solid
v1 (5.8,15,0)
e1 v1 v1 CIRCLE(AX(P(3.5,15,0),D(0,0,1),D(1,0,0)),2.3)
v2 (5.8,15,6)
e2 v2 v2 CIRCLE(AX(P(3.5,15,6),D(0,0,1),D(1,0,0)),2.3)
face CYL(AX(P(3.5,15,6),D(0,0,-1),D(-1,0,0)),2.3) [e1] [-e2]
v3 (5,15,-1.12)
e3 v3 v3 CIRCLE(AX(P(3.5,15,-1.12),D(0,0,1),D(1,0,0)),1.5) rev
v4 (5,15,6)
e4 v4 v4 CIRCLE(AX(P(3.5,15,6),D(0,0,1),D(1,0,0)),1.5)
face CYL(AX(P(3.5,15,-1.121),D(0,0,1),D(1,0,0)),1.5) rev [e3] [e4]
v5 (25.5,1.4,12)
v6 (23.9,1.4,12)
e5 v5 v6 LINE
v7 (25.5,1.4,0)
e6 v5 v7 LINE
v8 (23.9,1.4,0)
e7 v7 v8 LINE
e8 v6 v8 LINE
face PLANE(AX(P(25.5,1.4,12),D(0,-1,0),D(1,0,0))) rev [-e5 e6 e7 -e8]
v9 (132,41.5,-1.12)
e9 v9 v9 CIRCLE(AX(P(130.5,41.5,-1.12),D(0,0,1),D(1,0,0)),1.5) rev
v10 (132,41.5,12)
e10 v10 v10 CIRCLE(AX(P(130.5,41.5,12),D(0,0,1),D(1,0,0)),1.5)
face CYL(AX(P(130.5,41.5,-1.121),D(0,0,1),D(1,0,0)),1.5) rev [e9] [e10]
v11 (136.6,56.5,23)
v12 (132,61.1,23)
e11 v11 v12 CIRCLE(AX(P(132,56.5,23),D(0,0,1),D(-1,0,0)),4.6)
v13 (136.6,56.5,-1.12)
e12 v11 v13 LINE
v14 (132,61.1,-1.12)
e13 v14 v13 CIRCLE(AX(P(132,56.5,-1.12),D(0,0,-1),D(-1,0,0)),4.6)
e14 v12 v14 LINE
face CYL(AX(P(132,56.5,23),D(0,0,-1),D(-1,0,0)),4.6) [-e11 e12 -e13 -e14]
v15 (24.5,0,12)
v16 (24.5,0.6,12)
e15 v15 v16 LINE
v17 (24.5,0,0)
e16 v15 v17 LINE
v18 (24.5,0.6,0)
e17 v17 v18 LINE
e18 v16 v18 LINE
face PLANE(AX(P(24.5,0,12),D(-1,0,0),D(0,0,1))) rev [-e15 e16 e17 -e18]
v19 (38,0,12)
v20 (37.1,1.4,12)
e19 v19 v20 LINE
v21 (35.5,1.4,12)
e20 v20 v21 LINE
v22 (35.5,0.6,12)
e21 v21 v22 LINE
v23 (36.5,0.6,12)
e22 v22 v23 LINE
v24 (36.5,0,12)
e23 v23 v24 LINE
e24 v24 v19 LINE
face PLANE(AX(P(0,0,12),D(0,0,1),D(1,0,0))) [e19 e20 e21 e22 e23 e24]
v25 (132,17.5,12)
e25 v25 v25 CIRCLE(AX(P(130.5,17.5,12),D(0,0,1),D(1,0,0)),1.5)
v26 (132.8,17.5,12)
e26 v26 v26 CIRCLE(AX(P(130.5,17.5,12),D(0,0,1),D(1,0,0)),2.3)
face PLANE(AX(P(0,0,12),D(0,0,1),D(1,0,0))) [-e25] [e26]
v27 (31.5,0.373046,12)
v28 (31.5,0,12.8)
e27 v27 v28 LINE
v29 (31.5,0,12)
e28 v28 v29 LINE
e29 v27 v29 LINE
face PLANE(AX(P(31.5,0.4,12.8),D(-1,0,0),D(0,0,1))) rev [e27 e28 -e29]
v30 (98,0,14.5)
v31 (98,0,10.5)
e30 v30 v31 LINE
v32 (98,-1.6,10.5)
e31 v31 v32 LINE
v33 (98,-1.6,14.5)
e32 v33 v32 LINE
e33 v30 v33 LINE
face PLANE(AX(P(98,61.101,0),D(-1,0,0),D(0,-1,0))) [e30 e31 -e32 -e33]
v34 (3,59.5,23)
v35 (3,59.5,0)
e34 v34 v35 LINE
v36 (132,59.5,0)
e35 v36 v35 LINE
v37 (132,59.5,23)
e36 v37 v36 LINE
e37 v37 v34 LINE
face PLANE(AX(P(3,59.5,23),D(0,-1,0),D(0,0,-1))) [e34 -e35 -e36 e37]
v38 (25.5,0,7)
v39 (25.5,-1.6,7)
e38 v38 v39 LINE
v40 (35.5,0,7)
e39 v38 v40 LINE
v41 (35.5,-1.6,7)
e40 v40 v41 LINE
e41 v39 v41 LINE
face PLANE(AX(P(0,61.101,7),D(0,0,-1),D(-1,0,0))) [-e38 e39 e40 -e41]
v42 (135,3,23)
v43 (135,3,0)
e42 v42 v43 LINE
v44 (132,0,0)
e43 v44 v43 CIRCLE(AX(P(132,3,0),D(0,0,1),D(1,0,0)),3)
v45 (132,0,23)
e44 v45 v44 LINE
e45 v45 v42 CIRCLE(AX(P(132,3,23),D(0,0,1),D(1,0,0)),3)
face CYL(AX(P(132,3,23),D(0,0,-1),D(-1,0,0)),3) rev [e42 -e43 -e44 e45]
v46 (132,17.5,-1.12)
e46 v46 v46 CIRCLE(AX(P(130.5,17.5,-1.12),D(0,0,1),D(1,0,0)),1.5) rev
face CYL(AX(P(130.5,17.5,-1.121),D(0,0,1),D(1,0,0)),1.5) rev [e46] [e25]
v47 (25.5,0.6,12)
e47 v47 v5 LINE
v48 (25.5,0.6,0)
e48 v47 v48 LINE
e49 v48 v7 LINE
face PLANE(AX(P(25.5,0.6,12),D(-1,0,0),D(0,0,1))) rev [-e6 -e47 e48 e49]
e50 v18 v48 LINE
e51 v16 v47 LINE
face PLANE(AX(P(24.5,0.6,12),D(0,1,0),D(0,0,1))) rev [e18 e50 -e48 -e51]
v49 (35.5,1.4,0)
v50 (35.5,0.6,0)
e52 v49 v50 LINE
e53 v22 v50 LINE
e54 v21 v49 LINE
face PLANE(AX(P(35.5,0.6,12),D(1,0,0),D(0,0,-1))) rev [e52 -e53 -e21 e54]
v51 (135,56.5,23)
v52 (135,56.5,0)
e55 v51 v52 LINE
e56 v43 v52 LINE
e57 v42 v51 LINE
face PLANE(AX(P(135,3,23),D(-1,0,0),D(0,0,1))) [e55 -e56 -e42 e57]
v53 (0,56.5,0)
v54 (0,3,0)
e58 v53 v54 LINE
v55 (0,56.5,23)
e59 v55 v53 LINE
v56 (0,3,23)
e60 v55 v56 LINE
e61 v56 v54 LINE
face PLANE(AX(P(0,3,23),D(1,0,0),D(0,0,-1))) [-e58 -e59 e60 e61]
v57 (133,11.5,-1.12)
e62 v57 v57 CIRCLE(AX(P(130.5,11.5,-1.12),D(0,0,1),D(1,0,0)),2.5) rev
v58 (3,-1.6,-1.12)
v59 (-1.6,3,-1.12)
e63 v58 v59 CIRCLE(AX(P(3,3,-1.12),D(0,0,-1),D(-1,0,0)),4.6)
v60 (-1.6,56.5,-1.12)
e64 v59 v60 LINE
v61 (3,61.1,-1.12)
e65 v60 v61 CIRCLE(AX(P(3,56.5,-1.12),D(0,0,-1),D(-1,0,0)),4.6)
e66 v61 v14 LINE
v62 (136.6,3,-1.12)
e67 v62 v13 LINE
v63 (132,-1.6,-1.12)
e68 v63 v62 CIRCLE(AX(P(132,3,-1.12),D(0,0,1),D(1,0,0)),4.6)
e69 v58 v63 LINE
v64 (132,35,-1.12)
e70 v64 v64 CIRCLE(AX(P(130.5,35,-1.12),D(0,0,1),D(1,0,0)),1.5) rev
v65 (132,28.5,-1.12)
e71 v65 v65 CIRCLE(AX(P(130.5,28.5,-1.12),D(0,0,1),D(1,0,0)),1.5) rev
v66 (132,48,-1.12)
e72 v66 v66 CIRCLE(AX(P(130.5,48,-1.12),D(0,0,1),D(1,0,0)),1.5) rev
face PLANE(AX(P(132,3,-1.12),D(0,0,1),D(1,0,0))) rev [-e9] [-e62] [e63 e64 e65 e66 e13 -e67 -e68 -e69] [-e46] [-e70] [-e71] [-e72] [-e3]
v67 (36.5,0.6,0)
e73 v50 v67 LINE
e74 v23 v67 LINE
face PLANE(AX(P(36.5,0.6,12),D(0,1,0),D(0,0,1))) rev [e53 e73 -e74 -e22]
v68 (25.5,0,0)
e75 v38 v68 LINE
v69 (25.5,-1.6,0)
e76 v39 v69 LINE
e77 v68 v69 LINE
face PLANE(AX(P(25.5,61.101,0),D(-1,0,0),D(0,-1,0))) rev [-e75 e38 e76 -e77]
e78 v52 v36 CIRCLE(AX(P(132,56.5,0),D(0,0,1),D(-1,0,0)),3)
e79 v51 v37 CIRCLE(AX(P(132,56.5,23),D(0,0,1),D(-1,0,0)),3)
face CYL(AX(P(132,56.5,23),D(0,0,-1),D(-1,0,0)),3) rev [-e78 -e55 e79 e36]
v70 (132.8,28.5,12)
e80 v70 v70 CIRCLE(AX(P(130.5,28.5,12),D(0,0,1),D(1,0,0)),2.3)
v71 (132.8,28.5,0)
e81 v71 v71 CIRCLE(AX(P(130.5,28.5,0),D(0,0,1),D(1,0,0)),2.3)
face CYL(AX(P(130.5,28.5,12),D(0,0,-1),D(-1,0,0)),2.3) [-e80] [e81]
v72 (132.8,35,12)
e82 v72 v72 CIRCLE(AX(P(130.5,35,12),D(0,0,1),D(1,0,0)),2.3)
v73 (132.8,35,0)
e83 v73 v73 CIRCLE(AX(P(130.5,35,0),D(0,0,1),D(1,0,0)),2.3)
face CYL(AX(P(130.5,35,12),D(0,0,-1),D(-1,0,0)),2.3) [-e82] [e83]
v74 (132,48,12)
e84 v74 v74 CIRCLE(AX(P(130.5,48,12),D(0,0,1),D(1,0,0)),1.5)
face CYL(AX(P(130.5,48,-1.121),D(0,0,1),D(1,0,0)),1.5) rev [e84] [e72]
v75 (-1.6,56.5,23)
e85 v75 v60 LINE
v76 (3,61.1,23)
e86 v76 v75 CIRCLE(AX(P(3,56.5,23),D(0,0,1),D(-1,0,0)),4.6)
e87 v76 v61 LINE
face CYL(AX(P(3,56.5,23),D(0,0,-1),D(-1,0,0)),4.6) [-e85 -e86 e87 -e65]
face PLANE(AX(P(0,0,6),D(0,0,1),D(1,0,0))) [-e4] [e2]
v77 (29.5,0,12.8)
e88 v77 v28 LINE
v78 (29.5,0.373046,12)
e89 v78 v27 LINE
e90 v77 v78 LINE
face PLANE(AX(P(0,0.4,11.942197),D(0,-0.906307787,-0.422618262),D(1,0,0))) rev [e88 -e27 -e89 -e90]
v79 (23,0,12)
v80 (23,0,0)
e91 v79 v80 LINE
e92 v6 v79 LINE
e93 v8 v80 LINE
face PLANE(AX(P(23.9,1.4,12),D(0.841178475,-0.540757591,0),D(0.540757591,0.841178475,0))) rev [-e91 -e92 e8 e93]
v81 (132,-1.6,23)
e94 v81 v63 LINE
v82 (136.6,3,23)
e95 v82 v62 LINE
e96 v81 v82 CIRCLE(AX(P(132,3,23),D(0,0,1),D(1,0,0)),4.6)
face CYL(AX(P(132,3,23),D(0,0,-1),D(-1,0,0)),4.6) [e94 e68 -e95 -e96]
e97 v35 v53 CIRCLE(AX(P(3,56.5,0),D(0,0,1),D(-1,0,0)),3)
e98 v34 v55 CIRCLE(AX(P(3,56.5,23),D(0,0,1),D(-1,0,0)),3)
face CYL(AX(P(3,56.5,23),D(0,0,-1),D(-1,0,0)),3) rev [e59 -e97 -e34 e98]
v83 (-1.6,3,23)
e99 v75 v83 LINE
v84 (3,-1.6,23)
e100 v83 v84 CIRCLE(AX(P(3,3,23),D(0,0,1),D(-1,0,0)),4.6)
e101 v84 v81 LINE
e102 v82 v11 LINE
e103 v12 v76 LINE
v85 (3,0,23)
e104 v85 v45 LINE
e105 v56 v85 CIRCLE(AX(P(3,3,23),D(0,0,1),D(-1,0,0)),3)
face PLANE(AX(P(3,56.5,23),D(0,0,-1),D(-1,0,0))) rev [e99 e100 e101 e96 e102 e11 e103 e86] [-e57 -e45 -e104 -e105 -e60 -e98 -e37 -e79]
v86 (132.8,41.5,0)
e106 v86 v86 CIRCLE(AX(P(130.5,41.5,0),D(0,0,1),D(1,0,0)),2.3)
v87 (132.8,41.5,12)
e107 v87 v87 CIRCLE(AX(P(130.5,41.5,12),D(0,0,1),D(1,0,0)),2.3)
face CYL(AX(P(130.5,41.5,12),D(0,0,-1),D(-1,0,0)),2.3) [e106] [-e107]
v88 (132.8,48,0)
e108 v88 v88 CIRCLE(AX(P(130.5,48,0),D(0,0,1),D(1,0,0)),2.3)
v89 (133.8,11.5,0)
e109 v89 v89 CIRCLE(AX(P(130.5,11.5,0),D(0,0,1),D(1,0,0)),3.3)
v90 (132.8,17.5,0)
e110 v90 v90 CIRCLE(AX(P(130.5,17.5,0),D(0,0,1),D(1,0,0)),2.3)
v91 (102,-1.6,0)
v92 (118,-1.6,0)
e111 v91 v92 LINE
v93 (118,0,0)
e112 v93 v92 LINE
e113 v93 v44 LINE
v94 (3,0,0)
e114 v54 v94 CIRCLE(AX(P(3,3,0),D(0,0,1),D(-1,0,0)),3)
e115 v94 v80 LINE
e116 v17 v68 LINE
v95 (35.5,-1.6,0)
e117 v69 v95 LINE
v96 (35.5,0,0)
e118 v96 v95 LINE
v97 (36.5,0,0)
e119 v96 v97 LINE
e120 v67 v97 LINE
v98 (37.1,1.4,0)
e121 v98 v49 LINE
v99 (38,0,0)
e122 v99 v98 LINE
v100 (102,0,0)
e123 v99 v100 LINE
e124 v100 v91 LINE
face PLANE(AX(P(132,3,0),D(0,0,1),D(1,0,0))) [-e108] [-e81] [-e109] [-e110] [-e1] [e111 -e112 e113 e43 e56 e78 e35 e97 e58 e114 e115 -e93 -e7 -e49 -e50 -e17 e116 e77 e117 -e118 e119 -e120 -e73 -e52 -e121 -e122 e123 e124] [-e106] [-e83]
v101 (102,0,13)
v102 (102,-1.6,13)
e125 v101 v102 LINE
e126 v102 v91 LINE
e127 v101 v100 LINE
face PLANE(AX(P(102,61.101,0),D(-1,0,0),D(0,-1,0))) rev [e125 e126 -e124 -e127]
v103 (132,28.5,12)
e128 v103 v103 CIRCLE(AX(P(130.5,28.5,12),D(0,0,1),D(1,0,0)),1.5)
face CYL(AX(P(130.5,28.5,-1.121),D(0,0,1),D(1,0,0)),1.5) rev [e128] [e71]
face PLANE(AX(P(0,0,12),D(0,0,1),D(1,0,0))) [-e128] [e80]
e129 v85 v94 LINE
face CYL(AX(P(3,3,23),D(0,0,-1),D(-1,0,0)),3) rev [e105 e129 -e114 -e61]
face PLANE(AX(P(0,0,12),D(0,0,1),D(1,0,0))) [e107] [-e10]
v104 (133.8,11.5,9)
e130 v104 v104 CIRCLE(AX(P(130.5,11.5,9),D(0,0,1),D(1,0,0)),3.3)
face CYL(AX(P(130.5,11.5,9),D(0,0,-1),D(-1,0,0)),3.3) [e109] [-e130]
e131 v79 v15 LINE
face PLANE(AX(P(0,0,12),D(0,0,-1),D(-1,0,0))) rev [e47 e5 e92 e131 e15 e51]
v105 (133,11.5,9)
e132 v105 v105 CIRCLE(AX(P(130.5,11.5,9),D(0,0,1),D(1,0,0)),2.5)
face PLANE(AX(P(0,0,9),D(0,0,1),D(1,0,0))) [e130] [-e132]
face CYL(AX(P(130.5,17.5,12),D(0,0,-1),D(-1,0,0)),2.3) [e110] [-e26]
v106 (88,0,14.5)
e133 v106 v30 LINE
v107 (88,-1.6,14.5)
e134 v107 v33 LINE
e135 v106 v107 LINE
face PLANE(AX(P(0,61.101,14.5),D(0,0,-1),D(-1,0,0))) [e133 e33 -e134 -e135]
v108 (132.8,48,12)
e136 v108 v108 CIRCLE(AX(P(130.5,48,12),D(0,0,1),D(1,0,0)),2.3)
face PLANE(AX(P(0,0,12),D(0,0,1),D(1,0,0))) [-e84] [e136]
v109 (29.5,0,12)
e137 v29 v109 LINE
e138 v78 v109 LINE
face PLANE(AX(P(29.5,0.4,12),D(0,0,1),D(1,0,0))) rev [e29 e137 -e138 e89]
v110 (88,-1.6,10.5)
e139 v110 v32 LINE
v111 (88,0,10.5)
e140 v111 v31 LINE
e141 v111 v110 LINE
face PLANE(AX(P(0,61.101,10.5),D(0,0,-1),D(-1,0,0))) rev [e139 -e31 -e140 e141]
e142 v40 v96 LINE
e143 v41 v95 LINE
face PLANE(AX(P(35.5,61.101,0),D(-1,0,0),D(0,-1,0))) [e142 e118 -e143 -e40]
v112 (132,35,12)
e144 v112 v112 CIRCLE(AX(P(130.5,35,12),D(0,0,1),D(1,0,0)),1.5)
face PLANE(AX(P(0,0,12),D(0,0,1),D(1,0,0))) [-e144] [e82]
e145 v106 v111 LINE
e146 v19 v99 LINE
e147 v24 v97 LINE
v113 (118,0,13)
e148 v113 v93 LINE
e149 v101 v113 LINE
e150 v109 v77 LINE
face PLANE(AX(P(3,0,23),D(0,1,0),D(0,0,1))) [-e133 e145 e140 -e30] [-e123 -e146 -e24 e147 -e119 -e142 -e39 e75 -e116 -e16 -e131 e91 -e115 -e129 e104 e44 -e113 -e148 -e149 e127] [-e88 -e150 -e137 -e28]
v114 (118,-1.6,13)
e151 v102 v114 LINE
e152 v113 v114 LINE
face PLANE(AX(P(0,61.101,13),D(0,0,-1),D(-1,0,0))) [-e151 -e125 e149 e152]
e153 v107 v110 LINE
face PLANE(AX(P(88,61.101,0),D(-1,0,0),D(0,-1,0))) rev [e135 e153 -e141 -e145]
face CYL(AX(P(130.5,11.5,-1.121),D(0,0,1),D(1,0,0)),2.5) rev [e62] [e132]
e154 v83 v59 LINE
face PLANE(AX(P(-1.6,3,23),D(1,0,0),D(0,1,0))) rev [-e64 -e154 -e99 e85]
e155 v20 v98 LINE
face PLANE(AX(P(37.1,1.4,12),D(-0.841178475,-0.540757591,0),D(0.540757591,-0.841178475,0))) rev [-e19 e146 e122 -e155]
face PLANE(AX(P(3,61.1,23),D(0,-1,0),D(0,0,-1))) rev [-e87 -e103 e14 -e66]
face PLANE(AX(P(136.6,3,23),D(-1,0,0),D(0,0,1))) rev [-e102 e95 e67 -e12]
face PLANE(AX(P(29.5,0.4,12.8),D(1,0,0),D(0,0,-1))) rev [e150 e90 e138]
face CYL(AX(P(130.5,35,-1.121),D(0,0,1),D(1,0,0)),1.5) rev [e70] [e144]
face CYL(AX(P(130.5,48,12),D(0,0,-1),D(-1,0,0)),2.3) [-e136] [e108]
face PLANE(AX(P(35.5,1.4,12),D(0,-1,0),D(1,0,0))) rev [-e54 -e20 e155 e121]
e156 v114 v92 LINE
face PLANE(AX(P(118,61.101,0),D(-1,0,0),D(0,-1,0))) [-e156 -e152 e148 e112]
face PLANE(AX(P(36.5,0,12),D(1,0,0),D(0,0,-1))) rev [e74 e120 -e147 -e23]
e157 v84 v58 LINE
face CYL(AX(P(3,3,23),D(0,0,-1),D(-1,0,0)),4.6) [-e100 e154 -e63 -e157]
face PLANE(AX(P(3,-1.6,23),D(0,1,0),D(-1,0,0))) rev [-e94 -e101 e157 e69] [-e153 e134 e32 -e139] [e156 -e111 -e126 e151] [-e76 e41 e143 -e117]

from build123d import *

# Parameters (mm, degrees)
PARED_DEPTH             = 23
CONECTORES_REACH        = 154.052
CROQUIS2_W              = 16
CROQUIS2_H              = 13
CROQUIS2_W_2            = 10
CROQUIS2_H_2            = 4
CROQUIS2_H_3            = 7
BASE_START              = -1.12
BASE_FRENTE_DEPTH       = 1.12
LUCES_REACH             = 153.399
CROQUIS3_R              = 1.5
CROQUIS3_R_2            = 2.5
SALIENTE_EXTRUIR1_START = 12
CROQUIS3_3_R            = 2.3
CROQUIS3_3_R_2          = 1.5
SALIENTE_EXTRUIR1_DEPTH = 12
SALIENTE_EXTRUIR2_START = 9
CROQUIS3_4_R            = 3.3
CROQUIS3_4_R_2          = 2.5
SALIENTE_EXTRUIR2_DEPTH = 9
SALIENTE_EXTRUIR3_START = 6
CROQUIS3_5_R            = 2.3
CROQUIS3_5_R_2          = 1.5
SALIENTE_EXTRUIR3_DEPTH = 6
SALIENTE_EXTRUIR4_DEPTH = 12
CROQUIS5_W              = 2
CROQUIS5_H              = 0.8
SALIENTE_EXTRUIR5_DEPTH = 0.4
CHAFL_N1_SIZE           = 0.4
CHAFL_N1_SIZE_2         = 0.857802768


with BuildPart() as part:
    # Croquis1 → pared (new body)
    with BuildSketch(Plane.XY):
        with BuildLine():
            Line((3, 61.1), (132, 61.1))
            ThreePointArc((132, 61.1), (135.252691193, 59.752691193), (136.6, 56.5))
            Line((136.6, 56.5), (136.6, 3))
            ThreePointArc((136.6, 3), (135.252691193, -0.252691193), (132, -1.6))
            Line((132, -1.6), (3, -1.6))
            ThreePointArc((3, -1.6), (-0.252691193, -0.252691193), (-1.6, 3))
            Line((-1.6, 3), (-1.6, 56.5))
            ThreePointArc((-1.6, 56.5), (-0.252691193, 59.752691193), (3, 61.1))
        make_face()
        with BuildLine():
            Line((3, 0), (132, 0))
            ThreePointArc((132, 0), (134.121320344, 0.878679656), (135, 3))
            Line((135, 3), (135, 56.5))
            ThreePointArc((135, 56.5), (134.121320344, 58.621320344), (132, 59.5))
            Line((132, 59.5), (3, 59.5))
            ThreePointArc((3, 59.5), (0.878679656, 58.621320344), (0, 56.5))
            Line((0, 56.5), (0, 3))
            ThreePointArc((0, 3), (0.878679656, 0.878679656), (3, 0))
        make_face(mode=Mode.SUBTRACT)
    extrude(amount=PARED_DEPTH)

    # Croquis2 → conectores (cut, up to next)
    with BuildSketch(Plane.XZ.offset(1.6), mode=Mode.PRIVATE) as conectores_sk1:
        with Locations((110, 6.5)):
            Rectangle(CROQUIS2_W, CROQUIS2_H)
    conectores_tool1 = extrude(conectores_sk1.sketch, amount=-CONECTORES_REACH, mode=Mode.PRIVATE) & part.part
    # Croquis2 → conectores (cut, up to next)
    with BuildSketch(Plane.XZ.offset(1.6), mode=Mode.PRIVATE) as conectores_sk2:
        with Locations((93, 12.5)):
            Rectangle(CROQUIS2_W_2, CROQUIS2_H_2)
    conectores_tool2 = extrude(conectores_sk2.sketch, amount=-CONECTORES_REACH, mode=Mode.PRIVATE) & part.part
    # Croquis2 → conectores (cut, up to next)
    with BuildSketch(Plane.XZ.offset(1.6), mode=Mode.PRIVATE) as conectores_sk3:
        with Locations((30.5, 3.5)):
            Rectangle(CROQUIS2_W_2, CROQUIS2_H_3)
    conectores_tool3 = extrude(conectores_sk3.sketch, amount=-CONECTORES_REACH, mode=Mode.PRIVATE) & part.part
    add(conectores_tool1.solids().sort_by_distance((110, -1.6, 6.5))[0], mode=Mode.SUBTRACT)
    add(conectores_tool2.solids().sort_by_distance((93, -1.6, 12.5))[0], mode=Mode.SUBTRACT)
    add(conectores_tool3.solids().sort_by_distance((30.5, -1.6, 3.5))[0], mode=Mode.SUBTRACT)

    # Croquis1<2> → base frente (add)
    with BuildSketch(Plane.XY.offset(BASE_START)):
        with BuildLine():
            Line((3, 61.1), (132, 61.1))
            ThreePointArc((132, 61.1), (135.252691193, 59.752691193), (136.6, 56.5))
            Line((136.6, 56.5), (136.6, 3))
            ThreePointArc((136.6, 3), (135.252691193, -0.252691193), (132, -1.6))
            Line((132, -1.6), (3, -1.6))
            ThreePointArc((3, -1.6), (-0.252691193, -0.252691193), (-1.6, 3))
            Line((-1.6, 3), (-1.6, 56.5))
            ThreePointArc((-1.6, 56.5), (-0.252691193, 59.752691193), (3, 61.1))
        make_face()
    extrude(amount=BASE_FRENTE_DEPTH)

    # Croquis3 → luces (cut, up to next)
    with BuildSketch(Plane.XY, mode=Mode.PRIVATE) as luces_sk1:
        with Locations((130.5, 48)):
            Circle(CROQUIS3_R)
    luces_tool1 = extrude(luces_sk1.sketch, amount=-LUCES_REACH, mode=Mode.PRIVATE) & part.part
    # Croquis3 → luces (cut, up to next)
    with BuildSketch(Plane.XY, mode=Mode.PRIVATE) as luces_sk2:
        with Locations((130.5, 41.5)):
            Circle(CROQUIS3_R)
    luces_tool2 = extrude(luces_sk2.sketch, amount=-LUCES_REACH, mode=Mode.PRIVATE) & part.part
    # Croquis3 → luces (cut, up to next)
    with BuildSketch(Plane.XY, mode=Mode.PRIVATE) as luces_sk3:
        with Locations((130.5, 35)):
            Circle(CROQUIS3_R)
    luces_tool3 = extrude(luces_sk3.sketch, amount=-LUCES_REACH, mode=Mode.PRIVATE) & part.part
    # Croquis3 → luces (cut, up to next)
    with BuildSketch(Plane.XY, mode=Mode.PRIVATE) as luces_sk4:
        with Locations((130.5, 28.5)):
            Circle(CROQUIS3_R)
    luces_tool4 = extrude(luces_sk4.sketch, amount=-LUCES_REACH, mode=Mode.PRIVATE) & part.part
    # Croquis3 → luces (cut, up to next)
    with BuildSketch(Plane.XY, mode=Mode.PRIVATE) as luces_sk5:
        with Locations((130.5, 17.5)):
            Circle(CROQUIS3_R)
    luces_tool5 = extrude(luces_sk5.sketch, amount=-LUCES_REACH, mode=Mode.PRIVATE) & part.part
    # Croquis3 → luces (cut, up to next)
    with BuildSketch(Plane.XY, mode=Mode.PRIVATE) as luces_sk6:
        with Locations((130.5, 11.5)):
            Circle(CROQUIS3_R_2)
    luces_tool6 = extrude(luces_sk6.sketch, amount=-LUCES_REACH, mode=Mode.PRIVATE) & part.part
    # Croquis3 → luces (cut, up to next)
    with BuildSketch(Plane.XY, mode=Mode.PRIVATE) as luces_sk7:
        with Locations((3.5, 15)):
            Circle(CROQUIS3_R)
    luces_tool7 = extrude(luces_sk7.sketch, amount=-LUCES_REACH, mode=Mode.PRIVATE) & part.part
    add(luces_tool1.solids().sort_by_distance((130.5, 48, 0))[0], mode=Mode.SUBTRACT)
    add(luces_tool2.solids().sort_by_distance((130.5, 41.5, 0))[0], mode=Mode.SUBTRACT)
    add(luces_tool3.solids().sort_by_distance((130.5, 35, 0))[0], mode=Mode.SUBTRACT)
    add(luces_tool4.solids().sort_by_distance((130.5, 28.5, 0))[0], mode=Mode.SUBTRACT)
    add(luces_tool5.solids().sort_by_distance((130.5, 17.5, 0))[0], mode=Mode.SUBTRACT)
    add(luces_tool6.solids().sort_by_distance((130.5, 11.5, 0))[0], mode=Mode.SUBTRACT)
    add(luces_tool7.solids().sort_by_distance((3.5, 15, 0))[0], mode=Mode.SUBTRACT)

    # Croquis3<3> → Saliente-Extruir1 (add)
    # profile 1 of 5: a face of its own
    with BuildSketch(Plane.XY.offset(SALIENTE_EXTRUIR1_START)):
        with Locations((130.5, 17.5)):
            Circle(CROQUIS3_3_R)
        with Locations((130.5, 17.5)):
            Circle(CROQUIS3_3_R_2, mode=Mode.SUBTRACT)
    # profile 2 of 5: a face of its own
    with BuildSketch(Plane.XY.offset(SALIENTE_EXTRUIR1_START)):
        with Locations((130.5, 28.5)):
            Circle(CROQUIS3_3_R)
        with Locations((130.5, 28.5)):
            Circle(CROQUIS3_3_R_2, mode=Mode.SUBTRACT)
    # profile 3 of 5: a face of its own
    with BuildSketch(Plane.XY.offset(SALIENTE_EXTRUIR1_START)):
        with Locations((130.5, 35)):
            Circle(CROQUIS3_3_R)
        with Locations((130.5, 35)):
            Circle(CROQUIS3_3_R_2, mode=Mode.SUBTRACT)
    # profile 4 of 5: a face of its own
    with BuildSketch(Plane.XY.offset(SALIENTE_EXTRUIR1_START)):
        with Locations((130.5, 41.5)):
            Circle(CROQUIS3_3_R)
        with Locations((130.5, 41.5)):
            Circle(CROQUIS3_3_R_2, mode=Mode.SUBTRACT)
    # profile 5 of 5: a face of its own
    with BuildSketch(Plane.XY.offset(SALIENTE_EXTRUIR1_START)):
        with Locations((130.5, 48)):
            Circle(CROQUIS3_3_R)
        with Locations((130.5, 48)):
            Circle(CROQUIS3_3_R_2, mode=Mode.SUBTRACT)
    extrude(amount=-SALIENTE_EXTRUIR1_DEPTH)

    # Croquis3<4> → Saliente-Extruir2 (add)
    with BuildSketch(Plane.XY.offset(SALIENTE_EXTRUIR2_START)):
        with Locations((130.5, 11.5)):
            Circle(CROQUIS3_4_R)
        with Locations((130.5, 11.5)):
            Circle(CROQUIS3_4_R_2, mode=Mode.SUBTRACT)
    extrude(amount=-SALIENTE_EXTRUIR2_DEPTH)

    # Croquis3<5> → Saliente-Extruir3 (add)
    with BuildSketch(Plane.XY.offset(SALIENTE_EXTRUIR3_START)):
        with Locations((3.5, 15)):
            Circle(CROQUIS3_5_R)
        with Locations((3.5, 15)):
            Circle(CROQUIS3_5_R_2, mode=Mode.SUBTRACT)
    extrude(amount=-SALIENTE_EXTRUIR3_DEPTH)

    # Croquis4 → Saliente-Extruir4 (add)
    with BuildSketch(Plane.XY):
        Polygon((36.5, 0), (36.5, 0.6), (35.5, 0.6), (35.5, 1.4), (37.1, 1.4), (38, 0), align=None)
        Polygon((24.5, 0), (23, 0), (23.9, 1.4), (25.5, 1.4), (25.5, 0.6), (24.5, 0.6), align=None)
    extrude(amount=SALIENTE_EXTRUIR4_DEPTH)

    # Croquis5 → Saliente-Extruir5 (add)
    with BuildSketch(Plane(origin=(0, 0, 0), x_dir=(1, 0, 0), z_dir=(0, 1, 0))):
        with Locations((30.5, -12.4)):
            Rectangle(CROQUIS5_W, CROQUIS5_H)
    extrude(amount=SALIENTE_EXTRUIR5_DEPTH)

    # Chaflán1
    # the kernel refuses this chamfer: 0.857802768, 0.4 mm, written as the material it takes off along each edge
    with BuildSketch(Plane(origin=(27.277454068, 0.4, 12.8), x_dir=(0, -0.9971975577536771, 0.07481330637060238), z_dir=(1, 0, 0))) as chafl_n1_piece_1_section:
        Polygon((CHAFL_N1_SIZE * 0.997197557754, CHAFL_N1_SIZE * 0.0748133063706), (-CHAFL_N1_SIZE_2 * 0.0748133063884, CHAFL_N1_SIZE_2 * 0.997197557991), (0, 0), align=None)
    chafl_n1_piece_1 = extrude(amount=6.445091863, mode=Mode.PRIVATE)
    chafl_n1_piece_1 = split(chafl_n1_piece_1, bisect_by=Plane(origin=(30.5, 0, 12.509130299), z_dir=(0, 1, 0)), keep=Keep.TOP, mode=Mode.PRIVATE)
    add(chafl_n1_piece_1, mode=Mode.SUBTRACT)


solid = part.part
